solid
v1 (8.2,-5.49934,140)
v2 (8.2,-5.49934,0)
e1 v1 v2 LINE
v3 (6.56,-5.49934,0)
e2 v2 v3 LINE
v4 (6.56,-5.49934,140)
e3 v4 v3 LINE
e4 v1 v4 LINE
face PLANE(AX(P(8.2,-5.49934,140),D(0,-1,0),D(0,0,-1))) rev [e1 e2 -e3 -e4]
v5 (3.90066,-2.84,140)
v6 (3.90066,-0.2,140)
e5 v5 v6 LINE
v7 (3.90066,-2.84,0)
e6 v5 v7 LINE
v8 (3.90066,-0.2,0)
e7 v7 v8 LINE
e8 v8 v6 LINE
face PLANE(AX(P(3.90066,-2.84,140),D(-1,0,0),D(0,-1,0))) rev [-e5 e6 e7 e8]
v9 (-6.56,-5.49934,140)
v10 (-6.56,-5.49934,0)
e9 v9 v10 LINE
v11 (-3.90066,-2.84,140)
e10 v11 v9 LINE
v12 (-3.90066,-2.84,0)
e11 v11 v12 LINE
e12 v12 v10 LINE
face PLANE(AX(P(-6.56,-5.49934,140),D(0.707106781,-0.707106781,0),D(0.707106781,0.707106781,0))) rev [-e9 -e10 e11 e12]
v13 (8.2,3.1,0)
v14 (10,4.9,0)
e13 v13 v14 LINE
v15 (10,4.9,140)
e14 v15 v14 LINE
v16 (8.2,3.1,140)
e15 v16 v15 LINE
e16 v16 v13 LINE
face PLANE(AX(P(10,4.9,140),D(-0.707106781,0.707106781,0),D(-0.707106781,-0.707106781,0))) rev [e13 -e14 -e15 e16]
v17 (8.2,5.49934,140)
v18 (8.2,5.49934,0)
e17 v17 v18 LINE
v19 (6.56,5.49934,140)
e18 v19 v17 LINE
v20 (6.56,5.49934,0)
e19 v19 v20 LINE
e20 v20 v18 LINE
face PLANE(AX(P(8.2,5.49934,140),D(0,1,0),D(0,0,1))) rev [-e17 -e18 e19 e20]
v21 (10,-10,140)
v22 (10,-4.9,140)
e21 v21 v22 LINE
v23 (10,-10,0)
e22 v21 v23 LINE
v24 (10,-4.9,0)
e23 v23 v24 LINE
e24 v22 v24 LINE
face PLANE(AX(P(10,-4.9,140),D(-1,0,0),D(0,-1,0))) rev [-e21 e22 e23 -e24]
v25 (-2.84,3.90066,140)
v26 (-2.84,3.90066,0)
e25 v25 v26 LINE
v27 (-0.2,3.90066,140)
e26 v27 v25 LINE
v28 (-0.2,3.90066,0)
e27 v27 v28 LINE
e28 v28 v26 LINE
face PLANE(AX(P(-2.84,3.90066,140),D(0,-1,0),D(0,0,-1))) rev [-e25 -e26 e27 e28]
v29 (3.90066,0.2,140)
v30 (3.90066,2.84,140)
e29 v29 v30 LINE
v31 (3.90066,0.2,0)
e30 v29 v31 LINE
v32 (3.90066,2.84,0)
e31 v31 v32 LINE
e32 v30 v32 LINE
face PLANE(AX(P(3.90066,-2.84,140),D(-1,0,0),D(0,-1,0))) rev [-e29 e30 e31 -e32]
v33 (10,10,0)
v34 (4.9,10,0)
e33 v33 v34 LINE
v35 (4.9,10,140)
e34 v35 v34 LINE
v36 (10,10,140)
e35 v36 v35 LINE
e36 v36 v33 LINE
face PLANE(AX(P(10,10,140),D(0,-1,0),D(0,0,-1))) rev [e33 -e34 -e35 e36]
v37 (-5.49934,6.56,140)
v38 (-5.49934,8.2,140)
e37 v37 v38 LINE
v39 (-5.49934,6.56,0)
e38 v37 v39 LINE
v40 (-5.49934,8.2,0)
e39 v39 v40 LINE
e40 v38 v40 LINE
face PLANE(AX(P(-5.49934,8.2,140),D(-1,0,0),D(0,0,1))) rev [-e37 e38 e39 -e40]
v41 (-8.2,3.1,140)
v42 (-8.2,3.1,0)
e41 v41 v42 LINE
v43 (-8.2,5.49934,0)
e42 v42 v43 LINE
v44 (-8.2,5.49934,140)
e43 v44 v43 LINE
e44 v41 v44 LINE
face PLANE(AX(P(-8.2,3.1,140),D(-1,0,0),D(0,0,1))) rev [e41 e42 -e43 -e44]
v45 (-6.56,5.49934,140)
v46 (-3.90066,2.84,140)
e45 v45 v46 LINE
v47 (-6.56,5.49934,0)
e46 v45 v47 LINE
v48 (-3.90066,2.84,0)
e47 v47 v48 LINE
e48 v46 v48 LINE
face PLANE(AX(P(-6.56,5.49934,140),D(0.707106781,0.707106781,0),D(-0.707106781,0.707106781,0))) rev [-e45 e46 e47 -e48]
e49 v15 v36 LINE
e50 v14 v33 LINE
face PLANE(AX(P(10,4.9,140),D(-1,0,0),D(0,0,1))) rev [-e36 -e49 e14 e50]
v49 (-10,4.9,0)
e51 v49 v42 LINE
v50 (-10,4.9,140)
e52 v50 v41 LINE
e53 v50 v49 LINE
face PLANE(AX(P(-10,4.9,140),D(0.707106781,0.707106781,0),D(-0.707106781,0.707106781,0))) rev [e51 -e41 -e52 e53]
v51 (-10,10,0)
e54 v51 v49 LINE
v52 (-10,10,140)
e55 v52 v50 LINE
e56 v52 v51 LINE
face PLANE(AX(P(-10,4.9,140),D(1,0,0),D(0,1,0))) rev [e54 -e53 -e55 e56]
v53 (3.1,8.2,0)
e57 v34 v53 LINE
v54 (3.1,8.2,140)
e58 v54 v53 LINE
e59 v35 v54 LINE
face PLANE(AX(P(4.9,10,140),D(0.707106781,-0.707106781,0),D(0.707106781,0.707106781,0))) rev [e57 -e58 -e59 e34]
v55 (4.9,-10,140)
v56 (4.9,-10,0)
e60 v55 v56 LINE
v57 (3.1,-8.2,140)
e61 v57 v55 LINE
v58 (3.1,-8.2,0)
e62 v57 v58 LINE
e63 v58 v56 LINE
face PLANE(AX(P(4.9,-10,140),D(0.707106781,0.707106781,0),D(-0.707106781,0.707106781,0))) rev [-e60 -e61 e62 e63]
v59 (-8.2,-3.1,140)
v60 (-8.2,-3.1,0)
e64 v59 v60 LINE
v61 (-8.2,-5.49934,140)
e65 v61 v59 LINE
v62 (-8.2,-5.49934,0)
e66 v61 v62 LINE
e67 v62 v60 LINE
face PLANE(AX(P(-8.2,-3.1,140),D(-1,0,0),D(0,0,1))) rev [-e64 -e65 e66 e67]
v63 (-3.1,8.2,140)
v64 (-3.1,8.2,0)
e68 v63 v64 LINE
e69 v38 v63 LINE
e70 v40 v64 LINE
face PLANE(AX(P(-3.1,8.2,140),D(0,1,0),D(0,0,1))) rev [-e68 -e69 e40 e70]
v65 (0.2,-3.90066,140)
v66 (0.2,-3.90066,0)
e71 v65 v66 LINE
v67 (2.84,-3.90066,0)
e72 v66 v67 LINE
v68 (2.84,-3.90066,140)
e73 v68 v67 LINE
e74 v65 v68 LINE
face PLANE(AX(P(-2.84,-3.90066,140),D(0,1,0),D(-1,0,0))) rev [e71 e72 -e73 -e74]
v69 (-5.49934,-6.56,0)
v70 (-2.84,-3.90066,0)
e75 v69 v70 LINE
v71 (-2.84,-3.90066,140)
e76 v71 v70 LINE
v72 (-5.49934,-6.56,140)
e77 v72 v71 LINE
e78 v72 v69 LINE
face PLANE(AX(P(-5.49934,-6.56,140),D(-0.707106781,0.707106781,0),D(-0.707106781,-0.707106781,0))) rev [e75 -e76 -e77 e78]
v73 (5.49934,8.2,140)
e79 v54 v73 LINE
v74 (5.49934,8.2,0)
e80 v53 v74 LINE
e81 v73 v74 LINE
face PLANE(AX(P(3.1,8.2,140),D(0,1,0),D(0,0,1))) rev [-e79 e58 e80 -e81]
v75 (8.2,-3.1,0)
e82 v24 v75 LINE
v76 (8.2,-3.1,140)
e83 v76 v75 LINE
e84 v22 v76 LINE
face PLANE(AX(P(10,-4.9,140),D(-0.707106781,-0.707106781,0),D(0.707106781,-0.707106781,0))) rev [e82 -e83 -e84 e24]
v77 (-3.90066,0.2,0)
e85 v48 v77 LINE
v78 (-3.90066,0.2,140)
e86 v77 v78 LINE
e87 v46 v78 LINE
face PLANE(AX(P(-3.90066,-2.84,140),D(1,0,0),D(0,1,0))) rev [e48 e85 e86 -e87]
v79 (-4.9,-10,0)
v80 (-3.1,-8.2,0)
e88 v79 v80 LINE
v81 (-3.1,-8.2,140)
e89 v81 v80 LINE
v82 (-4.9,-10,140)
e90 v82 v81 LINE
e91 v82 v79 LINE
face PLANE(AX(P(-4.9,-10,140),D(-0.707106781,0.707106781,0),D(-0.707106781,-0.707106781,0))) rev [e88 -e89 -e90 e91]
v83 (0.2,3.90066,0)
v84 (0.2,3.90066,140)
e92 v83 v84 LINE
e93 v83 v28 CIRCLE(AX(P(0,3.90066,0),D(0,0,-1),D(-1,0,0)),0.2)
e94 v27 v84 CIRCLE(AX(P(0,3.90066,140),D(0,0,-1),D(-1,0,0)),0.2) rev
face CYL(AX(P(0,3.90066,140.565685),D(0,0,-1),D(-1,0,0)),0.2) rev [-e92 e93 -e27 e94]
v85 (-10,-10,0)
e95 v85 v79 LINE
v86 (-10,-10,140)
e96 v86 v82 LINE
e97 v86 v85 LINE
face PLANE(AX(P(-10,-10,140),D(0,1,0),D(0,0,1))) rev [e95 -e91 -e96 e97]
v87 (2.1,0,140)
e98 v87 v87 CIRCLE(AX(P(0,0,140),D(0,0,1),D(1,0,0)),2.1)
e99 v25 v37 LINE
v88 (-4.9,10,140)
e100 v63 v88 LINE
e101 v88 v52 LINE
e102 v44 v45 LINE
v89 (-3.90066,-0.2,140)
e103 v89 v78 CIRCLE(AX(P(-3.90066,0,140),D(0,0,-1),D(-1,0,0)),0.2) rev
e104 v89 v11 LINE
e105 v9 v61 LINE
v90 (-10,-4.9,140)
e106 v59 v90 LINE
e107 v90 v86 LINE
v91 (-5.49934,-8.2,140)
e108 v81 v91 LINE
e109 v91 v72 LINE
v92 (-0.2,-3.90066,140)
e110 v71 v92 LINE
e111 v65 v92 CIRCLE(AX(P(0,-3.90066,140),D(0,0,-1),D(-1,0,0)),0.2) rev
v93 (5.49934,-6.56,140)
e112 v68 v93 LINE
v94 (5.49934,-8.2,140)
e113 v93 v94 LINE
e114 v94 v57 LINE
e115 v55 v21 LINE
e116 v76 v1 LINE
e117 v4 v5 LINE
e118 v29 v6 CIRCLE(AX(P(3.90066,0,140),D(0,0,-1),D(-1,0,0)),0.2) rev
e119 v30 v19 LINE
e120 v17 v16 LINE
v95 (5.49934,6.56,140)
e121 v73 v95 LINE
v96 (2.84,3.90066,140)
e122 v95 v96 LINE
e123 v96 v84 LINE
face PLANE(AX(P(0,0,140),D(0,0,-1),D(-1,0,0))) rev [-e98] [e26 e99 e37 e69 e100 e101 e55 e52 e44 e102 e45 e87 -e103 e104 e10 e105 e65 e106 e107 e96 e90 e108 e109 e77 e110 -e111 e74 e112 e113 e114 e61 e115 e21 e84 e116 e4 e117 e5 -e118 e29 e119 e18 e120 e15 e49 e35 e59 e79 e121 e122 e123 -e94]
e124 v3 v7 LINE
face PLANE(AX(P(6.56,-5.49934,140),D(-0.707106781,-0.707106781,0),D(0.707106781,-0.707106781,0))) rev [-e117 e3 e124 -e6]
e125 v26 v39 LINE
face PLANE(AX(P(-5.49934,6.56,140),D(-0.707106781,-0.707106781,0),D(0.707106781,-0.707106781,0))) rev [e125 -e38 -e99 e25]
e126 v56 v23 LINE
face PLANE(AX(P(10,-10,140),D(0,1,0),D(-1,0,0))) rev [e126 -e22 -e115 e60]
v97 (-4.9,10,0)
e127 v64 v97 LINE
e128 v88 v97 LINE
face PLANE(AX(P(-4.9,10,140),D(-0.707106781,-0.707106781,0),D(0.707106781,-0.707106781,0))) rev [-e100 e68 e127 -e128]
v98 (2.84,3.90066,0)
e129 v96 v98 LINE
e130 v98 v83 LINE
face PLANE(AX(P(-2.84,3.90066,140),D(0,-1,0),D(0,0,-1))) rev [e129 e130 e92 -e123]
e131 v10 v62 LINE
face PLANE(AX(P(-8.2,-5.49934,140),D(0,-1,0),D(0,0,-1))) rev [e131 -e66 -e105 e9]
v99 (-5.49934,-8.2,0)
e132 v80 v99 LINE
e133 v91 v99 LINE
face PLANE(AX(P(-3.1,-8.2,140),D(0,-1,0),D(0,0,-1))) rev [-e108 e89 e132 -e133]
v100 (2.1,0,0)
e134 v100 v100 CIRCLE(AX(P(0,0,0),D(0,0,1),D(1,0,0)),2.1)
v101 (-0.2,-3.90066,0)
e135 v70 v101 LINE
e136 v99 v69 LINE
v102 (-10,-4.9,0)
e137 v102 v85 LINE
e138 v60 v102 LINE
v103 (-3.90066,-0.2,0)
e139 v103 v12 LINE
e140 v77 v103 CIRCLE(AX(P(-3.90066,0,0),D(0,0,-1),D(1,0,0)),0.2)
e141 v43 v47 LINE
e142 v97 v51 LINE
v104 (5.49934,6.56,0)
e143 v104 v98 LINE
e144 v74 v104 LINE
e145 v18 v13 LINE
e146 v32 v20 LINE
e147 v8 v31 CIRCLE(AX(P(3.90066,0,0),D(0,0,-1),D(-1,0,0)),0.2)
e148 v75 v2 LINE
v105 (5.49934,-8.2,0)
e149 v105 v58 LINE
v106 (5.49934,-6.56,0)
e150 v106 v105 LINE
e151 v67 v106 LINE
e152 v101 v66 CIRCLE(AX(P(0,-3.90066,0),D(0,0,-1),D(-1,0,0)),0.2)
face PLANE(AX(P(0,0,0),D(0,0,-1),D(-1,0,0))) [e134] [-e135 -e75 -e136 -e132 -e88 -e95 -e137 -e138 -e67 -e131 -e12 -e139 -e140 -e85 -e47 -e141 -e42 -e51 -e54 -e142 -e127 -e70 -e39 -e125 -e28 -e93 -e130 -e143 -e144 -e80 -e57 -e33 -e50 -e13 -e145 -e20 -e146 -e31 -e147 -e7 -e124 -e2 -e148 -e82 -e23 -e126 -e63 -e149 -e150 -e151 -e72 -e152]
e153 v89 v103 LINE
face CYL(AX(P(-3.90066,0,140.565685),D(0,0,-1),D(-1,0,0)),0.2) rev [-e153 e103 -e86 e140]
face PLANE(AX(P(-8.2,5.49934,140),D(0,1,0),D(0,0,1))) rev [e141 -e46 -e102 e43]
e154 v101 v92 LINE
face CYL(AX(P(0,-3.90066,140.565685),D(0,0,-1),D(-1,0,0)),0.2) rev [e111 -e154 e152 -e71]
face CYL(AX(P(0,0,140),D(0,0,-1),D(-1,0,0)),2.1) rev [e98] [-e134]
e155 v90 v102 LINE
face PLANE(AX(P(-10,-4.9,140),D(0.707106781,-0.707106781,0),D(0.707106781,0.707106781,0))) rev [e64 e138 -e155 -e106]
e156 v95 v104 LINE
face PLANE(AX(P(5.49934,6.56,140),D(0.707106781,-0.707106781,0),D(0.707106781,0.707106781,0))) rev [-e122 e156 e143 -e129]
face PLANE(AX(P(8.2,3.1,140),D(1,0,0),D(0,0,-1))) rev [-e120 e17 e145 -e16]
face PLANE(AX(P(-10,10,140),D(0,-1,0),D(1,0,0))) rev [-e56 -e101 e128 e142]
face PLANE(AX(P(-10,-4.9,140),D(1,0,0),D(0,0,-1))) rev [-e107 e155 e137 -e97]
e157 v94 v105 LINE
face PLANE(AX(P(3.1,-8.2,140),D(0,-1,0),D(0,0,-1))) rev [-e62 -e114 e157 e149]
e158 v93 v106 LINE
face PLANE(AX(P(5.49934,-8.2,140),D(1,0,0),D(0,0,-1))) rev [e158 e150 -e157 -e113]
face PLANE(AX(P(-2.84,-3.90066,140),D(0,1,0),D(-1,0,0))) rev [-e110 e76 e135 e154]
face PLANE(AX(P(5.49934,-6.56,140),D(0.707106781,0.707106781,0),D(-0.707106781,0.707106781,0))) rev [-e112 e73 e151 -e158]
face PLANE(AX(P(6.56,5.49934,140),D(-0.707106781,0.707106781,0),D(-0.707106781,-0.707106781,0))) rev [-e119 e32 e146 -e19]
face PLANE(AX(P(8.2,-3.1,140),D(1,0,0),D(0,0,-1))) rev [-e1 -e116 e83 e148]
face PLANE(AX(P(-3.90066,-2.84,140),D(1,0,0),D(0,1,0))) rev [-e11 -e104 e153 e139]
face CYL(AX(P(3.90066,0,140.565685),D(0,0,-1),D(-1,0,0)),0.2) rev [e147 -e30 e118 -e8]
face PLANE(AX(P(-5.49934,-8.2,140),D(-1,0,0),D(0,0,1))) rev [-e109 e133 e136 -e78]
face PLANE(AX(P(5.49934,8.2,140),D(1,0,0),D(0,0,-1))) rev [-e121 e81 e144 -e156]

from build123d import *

# Parameters (mm, degrees)
SKETCH1_R           = 2.1
BOSS_EXTRUDE1_DEPTH = 140
CUT_EXTRUDE1_DEPTH  = 140


with BuildPart() as part:
    # Sketch1 → Boss-Extrude1 (new body)
    with BuildSketch(Plane.XY):
        Polygon((-10, -4.9), (-10, -10), (-4.9, -10), (-3.1, -8.2), (-5.499339828, -8.2), (-5.499339828, -6.56), (-2.84, -3.900660172), (2.84, -3.900660172), (5.499339828, -6.56), (5.499339828, -8.2), (3.1, -8.2), (4.9, -10), (10, -10), (10, -4.9), (8.2, -3.1), (8.2, -5.499339828), (6.56, -5.499339828), (3.900660172, -2.84), (3.900660172, 2.84), (6.56, 5.499339828), (8.2, 5.499339828), (8.2, 3.1), (10, 4.9), (10, 10), (4.9, 10), (3.1, 8.2), (5.499339828, 8.2), (5.499339828, 6.56), (2.84, 3.900660172), (-2.84, 3.900660172), (-5.499339828, 6.56), (-5.499339828, 8.2), (-3.1, 8.2), (-4.9, 10), (-10, 10), (-10, 4.9), (-8.2, 3.1), (-8.2, 5.499339828), (-6.56, 5.499339828), (-3.900660172, 2.84), (-3.900660172, -2.84), (-6.56, -5.499339828), (-8.2, -5.499339828), (-8.2, -3.1), align=None)
        Circle(SKETCH1_R, mode=Mode.SUBTRACT)
    extrude(amount=BOSS_EXTRUDE1_DEPTH)

    # Cut-Extrude1: read off the stored shape, not the designer's step
    # Cut-Extrude1 outline → Cut-Extrude1 (cut)
    with BuildSketch(Plane.XY):
        with BuildLine():
            ThreePointArc((-3.900660172, -0.2), (-3.700660172, 0), (-3.900660172, 0.2))
            Line((-3.900660172, 0.2), (-3.900660172, -0.2))
        make_face()
        with BuildLine():
            ThreePointArc((-0.2, 3.900660172), (0, 3.700660172), (0.2, 3.900660172))
            Line((0.2, 3.900660172), (-0.2, 3.900660172))
        make_face()
        with BuildLine():
            ThreePointArc((3.900660172, 0.2), (3.700660172, 0), (3.900660172, -0.2))
            Line((3.900660172, -0.2), (3.900660172, 0.2))
        make_face()
        with BuildLine():
            ThreePointArc((0.2, -3.900660172), (0, -3.700660172), (-0.2, -3.900660172))
            Line((-0.2, -3.900660172), (0.2, -3.900660172))
        make_face()
    extrude(amount=CUT_EXTRUDE1_DEPTH, mode=Mode.SUBTRACT)


solid = part.part
